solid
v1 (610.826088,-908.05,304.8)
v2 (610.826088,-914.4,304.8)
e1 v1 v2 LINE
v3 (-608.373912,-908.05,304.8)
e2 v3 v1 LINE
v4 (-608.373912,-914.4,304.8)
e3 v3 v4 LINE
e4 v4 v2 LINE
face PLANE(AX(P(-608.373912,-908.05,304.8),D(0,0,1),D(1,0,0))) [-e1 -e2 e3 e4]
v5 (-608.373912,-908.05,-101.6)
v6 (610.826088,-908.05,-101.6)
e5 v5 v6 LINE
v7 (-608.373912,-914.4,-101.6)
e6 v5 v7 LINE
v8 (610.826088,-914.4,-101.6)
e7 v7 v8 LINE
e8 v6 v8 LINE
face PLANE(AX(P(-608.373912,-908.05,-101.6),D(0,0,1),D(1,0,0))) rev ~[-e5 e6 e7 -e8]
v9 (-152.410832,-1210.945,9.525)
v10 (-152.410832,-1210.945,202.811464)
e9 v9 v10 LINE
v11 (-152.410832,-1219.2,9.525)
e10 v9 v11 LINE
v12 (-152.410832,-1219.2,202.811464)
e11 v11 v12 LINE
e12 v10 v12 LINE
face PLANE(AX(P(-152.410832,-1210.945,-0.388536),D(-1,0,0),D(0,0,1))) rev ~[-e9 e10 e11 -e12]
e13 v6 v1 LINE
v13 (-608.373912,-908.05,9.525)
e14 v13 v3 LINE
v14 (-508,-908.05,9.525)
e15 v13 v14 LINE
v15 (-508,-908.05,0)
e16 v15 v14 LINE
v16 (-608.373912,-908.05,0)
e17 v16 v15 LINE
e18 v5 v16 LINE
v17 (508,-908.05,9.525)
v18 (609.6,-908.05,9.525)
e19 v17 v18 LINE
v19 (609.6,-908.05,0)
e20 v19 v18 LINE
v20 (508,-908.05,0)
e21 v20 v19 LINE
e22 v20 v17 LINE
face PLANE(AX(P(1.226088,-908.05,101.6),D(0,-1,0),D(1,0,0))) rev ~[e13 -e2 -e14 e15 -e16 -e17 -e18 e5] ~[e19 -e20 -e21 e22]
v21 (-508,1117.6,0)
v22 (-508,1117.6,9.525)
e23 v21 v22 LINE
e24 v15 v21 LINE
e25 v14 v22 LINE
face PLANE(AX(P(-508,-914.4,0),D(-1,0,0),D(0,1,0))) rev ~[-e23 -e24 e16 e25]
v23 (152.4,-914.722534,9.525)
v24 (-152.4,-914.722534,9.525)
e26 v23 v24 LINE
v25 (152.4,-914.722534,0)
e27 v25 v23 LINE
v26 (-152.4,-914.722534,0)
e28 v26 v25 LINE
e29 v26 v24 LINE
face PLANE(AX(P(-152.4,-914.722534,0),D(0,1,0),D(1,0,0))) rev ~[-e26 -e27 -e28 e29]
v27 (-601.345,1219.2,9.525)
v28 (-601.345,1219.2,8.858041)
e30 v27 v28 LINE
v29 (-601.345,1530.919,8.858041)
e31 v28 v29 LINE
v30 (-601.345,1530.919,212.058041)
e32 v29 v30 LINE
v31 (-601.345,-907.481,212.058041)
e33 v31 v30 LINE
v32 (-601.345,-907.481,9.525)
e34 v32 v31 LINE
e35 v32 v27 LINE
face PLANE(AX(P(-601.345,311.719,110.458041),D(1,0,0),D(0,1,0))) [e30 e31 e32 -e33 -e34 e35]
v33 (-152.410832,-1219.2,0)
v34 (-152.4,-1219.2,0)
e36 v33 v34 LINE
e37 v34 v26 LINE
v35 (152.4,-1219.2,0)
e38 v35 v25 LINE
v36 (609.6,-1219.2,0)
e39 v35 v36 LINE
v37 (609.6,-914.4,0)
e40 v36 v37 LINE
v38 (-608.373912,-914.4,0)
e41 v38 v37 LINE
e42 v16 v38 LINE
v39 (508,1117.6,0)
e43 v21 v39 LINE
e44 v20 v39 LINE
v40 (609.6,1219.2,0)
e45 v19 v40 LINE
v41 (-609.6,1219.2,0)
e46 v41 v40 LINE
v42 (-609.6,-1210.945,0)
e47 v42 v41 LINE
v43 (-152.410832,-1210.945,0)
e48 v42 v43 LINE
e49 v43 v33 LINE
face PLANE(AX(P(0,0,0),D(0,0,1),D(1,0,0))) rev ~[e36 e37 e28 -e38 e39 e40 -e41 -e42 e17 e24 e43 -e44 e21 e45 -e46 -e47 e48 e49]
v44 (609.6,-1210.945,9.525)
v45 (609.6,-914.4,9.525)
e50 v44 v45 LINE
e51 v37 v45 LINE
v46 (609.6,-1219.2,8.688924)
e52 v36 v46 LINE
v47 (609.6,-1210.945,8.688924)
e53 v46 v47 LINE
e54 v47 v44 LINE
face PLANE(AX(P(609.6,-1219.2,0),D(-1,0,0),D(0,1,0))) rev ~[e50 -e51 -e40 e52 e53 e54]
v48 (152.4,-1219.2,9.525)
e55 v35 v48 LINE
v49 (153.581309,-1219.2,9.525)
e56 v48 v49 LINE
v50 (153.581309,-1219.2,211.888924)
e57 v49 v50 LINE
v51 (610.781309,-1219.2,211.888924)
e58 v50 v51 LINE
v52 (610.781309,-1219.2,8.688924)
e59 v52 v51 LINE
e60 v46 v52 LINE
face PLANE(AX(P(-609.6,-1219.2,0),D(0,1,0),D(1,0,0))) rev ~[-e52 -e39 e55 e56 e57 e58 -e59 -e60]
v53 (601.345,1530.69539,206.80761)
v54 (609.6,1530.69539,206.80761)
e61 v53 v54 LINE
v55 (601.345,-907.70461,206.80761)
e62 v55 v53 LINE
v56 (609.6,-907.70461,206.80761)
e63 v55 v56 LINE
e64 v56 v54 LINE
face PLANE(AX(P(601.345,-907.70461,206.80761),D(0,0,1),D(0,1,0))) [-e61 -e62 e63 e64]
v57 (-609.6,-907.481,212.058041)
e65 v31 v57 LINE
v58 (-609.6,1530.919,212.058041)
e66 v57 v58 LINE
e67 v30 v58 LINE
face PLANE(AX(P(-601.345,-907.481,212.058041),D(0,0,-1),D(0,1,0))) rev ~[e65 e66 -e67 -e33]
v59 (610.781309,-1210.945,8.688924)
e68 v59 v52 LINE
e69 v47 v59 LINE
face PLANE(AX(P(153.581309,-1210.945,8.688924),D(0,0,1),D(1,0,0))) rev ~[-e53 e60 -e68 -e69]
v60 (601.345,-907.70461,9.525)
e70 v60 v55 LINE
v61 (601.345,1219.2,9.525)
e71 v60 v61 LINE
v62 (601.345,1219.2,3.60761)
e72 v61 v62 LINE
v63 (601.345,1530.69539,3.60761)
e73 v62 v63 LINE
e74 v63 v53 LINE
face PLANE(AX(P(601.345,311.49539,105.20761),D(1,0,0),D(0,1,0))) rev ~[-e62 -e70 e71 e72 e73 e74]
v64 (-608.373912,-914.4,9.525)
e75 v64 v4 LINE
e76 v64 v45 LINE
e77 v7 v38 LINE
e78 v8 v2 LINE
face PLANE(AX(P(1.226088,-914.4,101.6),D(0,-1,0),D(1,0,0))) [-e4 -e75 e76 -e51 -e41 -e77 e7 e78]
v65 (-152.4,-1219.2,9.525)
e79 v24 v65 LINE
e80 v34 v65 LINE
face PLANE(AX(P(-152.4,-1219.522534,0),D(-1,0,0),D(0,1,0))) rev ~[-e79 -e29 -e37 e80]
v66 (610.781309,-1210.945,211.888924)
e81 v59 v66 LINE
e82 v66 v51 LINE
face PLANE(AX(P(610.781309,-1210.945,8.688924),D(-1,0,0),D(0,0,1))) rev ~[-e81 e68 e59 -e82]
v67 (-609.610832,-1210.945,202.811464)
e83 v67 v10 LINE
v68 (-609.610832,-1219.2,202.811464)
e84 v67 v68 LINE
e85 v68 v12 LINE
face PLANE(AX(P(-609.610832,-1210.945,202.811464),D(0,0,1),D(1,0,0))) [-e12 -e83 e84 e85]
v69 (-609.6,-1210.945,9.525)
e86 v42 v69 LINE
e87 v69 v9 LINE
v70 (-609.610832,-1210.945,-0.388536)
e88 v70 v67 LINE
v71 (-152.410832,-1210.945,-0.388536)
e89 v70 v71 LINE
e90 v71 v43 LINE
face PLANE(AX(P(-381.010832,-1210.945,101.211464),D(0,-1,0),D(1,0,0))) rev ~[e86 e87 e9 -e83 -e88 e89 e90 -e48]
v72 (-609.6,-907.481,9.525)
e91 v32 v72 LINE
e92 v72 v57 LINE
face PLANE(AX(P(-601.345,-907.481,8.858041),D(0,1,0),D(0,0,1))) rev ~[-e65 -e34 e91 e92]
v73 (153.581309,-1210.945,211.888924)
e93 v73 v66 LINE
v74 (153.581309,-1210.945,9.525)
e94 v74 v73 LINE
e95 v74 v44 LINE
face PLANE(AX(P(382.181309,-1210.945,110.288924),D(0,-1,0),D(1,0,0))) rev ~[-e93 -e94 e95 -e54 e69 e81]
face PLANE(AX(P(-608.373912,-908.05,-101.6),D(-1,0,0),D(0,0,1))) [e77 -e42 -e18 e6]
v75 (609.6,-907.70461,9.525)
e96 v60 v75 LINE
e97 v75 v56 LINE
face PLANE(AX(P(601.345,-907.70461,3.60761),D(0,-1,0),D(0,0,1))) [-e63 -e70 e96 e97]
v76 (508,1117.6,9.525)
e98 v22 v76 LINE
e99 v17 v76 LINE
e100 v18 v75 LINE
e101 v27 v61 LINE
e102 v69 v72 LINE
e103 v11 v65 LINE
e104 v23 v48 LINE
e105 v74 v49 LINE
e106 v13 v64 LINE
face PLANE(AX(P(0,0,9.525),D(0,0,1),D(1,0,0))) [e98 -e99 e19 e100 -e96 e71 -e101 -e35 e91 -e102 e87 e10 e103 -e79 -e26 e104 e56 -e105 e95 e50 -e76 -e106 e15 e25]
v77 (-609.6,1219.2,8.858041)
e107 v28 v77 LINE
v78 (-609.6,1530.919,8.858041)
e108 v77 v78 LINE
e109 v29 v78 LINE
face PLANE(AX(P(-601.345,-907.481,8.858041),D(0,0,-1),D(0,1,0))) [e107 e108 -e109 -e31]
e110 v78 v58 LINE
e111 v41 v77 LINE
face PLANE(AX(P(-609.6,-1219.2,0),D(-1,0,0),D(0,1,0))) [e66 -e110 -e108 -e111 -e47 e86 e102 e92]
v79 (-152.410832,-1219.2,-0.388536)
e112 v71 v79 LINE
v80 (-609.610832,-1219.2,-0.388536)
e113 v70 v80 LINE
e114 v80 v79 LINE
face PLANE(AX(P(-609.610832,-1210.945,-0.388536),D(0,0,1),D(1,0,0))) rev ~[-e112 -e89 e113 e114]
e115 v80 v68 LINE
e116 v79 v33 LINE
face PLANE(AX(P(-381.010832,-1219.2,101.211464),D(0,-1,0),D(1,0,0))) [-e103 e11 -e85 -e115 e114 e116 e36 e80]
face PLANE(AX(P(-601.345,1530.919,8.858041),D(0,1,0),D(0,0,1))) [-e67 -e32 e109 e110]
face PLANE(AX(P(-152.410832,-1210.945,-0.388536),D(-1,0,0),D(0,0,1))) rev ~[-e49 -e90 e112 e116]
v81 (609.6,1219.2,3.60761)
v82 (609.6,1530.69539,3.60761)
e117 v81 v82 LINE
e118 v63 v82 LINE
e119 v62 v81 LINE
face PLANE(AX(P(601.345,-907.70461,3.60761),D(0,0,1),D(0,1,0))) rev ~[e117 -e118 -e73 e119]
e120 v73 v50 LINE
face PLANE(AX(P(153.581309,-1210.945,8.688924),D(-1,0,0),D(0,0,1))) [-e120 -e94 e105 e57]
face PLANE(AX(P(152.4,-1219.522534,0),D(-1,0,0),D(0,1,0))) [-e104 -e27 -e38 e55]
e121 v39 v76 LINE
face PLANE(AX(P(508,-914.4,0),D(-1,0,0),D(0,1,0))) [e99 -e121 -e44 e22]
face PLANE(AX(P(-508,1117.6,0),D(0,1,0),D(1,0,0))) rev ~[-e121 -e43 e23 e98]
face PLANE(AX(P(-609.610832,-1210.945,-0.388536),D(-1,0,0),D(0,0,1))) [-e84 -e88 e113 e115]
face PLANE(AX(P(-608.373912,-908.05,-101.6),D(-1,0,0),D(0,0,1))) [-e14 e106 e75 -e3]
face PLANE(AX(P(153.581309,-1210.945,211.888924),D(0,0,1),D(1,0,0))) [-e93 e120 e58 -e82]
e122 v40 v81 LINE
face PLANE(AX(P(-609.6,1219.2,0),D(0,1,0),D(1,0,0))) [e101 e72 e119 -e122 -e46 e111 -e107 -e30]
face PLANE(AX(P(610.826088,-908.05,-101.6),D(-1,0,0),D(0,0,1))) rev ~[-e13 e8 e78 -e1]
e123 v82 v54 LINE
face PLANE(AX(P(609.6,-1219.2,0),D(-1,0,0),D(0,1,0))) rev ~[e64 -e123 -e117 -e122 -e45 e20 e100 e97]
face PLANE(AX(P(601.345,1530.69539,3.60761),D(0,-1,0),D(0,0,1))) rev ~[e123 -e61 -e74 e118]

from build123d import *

# Parameters (mm, degrees)
F0_W      = 1219.2
F0_H      = 2438.4
F0_W_2    = 1016
F0_H_2    = 2032
F1_DEPTH  = 9.525
F2_DEPTH  = 9.525
F4_START  = 908.05
F3_W      = 1219.2
F3_H      = 406.4
F4_DEPTH  = 6.35
F6_START  = 601.345
F5_W      = 2438.4
F5_H      = 203.2
F6_DEPTH  = 8.255
F8_START  = -601.345
F7_W      = 2438.4
F7_H      = 203.2
F8_DEPTH  = 8.255
F10_W     = 304.8
F10_H     = 304.8
F11_DEPTH = 43.18
F12_START = 1210.945
F9_W      = 457.2
F9_H      = 203.2
F12_DEPTH = 8.255
F14_START = 1210.945
F13_W     = 457.2
F13_H     = 203.2
F14_DEPTH = 8.255


# Not quite as in the source:
# - a feature names something its author has since deleted; it is built from what else it names


with BuildPart() as f1:
    # F0 (on Top) → F1 (new body)
    with BuildSketch(Plane.XY):
        Rectangle(F0_W, F0_H)
        with Locations((0, 101.6)):
            Rectangle(F0_W_2, F0_H_2, mode=Mode.SUBTRACT)
    extrude(amount=F1_DEPTH)

    # F0 (on Top) → F2 (cut)
    with BuildSketch(Plane.XY):
        Rectangle(F0_W, F0_H)
        with Locations((0, 101.6)):
            Rectangle(F0_W_2, F0_H_2, mode=Mode.SUBTRACT)
    extrude(amount=-F2_DEPTH, mode=Mode.SUBTRACT)

    # F3 (on Front) → F4 (join)
    with BuildSketch(Plane.XZ.offset(F4_START)):
        with Locations((1.2260880321, 101.6)):
            Rectangle(F3_W, F3_H)
    extrude(amount=F4_DEPTH)

    # F5 (on Right) → F6 (join)
    with BuildSketch(Plane.YZ.offset(F6_START)):
        with Locations((311.4953897893, 105.20761006)):
            Rectangle(F5_W, F5_H)
    extrude(amount=F6_DEPTH)

    # F7 (on Right) → F8 (join)
    with BuildSketch(Plane.YZ.offset(F8_START)):
        with Locations((311.7190003395, 110.4580410756)):
            Rectangle(F7_W, F7_H)
    extrude(amount=-F8_DEPTH)

    # F10 (on Top) → F11 (cut)
    with BuildSketch(Plane.XY):
        with Locations((0, -1067.1225335449)):
            Rectangle(F10_W, F10_H)
    extrude(amount=F11_DEPTH, mode=Mode.SUBTRACT)

    # F9 (on Front) → F12 (join)
    with BuildSketch(Plane.XZ.offset(F12_START)):
        with Locations((-381.010832265, 101.2114638133)):
            Rectangle(F9_W, F9_H)
    extrude(amount=F12_DEPTH)

    # F13 (on Front) → F14 (join)
    with BuildSketch(Plane.XZ.offset(F14_START)):
        with Locations((382.1813091636, 110.2889241311)):
            Rectangle(F13_W, F13_H)
    extrude(amount=F14_DEPTH)


solid = f1.part
